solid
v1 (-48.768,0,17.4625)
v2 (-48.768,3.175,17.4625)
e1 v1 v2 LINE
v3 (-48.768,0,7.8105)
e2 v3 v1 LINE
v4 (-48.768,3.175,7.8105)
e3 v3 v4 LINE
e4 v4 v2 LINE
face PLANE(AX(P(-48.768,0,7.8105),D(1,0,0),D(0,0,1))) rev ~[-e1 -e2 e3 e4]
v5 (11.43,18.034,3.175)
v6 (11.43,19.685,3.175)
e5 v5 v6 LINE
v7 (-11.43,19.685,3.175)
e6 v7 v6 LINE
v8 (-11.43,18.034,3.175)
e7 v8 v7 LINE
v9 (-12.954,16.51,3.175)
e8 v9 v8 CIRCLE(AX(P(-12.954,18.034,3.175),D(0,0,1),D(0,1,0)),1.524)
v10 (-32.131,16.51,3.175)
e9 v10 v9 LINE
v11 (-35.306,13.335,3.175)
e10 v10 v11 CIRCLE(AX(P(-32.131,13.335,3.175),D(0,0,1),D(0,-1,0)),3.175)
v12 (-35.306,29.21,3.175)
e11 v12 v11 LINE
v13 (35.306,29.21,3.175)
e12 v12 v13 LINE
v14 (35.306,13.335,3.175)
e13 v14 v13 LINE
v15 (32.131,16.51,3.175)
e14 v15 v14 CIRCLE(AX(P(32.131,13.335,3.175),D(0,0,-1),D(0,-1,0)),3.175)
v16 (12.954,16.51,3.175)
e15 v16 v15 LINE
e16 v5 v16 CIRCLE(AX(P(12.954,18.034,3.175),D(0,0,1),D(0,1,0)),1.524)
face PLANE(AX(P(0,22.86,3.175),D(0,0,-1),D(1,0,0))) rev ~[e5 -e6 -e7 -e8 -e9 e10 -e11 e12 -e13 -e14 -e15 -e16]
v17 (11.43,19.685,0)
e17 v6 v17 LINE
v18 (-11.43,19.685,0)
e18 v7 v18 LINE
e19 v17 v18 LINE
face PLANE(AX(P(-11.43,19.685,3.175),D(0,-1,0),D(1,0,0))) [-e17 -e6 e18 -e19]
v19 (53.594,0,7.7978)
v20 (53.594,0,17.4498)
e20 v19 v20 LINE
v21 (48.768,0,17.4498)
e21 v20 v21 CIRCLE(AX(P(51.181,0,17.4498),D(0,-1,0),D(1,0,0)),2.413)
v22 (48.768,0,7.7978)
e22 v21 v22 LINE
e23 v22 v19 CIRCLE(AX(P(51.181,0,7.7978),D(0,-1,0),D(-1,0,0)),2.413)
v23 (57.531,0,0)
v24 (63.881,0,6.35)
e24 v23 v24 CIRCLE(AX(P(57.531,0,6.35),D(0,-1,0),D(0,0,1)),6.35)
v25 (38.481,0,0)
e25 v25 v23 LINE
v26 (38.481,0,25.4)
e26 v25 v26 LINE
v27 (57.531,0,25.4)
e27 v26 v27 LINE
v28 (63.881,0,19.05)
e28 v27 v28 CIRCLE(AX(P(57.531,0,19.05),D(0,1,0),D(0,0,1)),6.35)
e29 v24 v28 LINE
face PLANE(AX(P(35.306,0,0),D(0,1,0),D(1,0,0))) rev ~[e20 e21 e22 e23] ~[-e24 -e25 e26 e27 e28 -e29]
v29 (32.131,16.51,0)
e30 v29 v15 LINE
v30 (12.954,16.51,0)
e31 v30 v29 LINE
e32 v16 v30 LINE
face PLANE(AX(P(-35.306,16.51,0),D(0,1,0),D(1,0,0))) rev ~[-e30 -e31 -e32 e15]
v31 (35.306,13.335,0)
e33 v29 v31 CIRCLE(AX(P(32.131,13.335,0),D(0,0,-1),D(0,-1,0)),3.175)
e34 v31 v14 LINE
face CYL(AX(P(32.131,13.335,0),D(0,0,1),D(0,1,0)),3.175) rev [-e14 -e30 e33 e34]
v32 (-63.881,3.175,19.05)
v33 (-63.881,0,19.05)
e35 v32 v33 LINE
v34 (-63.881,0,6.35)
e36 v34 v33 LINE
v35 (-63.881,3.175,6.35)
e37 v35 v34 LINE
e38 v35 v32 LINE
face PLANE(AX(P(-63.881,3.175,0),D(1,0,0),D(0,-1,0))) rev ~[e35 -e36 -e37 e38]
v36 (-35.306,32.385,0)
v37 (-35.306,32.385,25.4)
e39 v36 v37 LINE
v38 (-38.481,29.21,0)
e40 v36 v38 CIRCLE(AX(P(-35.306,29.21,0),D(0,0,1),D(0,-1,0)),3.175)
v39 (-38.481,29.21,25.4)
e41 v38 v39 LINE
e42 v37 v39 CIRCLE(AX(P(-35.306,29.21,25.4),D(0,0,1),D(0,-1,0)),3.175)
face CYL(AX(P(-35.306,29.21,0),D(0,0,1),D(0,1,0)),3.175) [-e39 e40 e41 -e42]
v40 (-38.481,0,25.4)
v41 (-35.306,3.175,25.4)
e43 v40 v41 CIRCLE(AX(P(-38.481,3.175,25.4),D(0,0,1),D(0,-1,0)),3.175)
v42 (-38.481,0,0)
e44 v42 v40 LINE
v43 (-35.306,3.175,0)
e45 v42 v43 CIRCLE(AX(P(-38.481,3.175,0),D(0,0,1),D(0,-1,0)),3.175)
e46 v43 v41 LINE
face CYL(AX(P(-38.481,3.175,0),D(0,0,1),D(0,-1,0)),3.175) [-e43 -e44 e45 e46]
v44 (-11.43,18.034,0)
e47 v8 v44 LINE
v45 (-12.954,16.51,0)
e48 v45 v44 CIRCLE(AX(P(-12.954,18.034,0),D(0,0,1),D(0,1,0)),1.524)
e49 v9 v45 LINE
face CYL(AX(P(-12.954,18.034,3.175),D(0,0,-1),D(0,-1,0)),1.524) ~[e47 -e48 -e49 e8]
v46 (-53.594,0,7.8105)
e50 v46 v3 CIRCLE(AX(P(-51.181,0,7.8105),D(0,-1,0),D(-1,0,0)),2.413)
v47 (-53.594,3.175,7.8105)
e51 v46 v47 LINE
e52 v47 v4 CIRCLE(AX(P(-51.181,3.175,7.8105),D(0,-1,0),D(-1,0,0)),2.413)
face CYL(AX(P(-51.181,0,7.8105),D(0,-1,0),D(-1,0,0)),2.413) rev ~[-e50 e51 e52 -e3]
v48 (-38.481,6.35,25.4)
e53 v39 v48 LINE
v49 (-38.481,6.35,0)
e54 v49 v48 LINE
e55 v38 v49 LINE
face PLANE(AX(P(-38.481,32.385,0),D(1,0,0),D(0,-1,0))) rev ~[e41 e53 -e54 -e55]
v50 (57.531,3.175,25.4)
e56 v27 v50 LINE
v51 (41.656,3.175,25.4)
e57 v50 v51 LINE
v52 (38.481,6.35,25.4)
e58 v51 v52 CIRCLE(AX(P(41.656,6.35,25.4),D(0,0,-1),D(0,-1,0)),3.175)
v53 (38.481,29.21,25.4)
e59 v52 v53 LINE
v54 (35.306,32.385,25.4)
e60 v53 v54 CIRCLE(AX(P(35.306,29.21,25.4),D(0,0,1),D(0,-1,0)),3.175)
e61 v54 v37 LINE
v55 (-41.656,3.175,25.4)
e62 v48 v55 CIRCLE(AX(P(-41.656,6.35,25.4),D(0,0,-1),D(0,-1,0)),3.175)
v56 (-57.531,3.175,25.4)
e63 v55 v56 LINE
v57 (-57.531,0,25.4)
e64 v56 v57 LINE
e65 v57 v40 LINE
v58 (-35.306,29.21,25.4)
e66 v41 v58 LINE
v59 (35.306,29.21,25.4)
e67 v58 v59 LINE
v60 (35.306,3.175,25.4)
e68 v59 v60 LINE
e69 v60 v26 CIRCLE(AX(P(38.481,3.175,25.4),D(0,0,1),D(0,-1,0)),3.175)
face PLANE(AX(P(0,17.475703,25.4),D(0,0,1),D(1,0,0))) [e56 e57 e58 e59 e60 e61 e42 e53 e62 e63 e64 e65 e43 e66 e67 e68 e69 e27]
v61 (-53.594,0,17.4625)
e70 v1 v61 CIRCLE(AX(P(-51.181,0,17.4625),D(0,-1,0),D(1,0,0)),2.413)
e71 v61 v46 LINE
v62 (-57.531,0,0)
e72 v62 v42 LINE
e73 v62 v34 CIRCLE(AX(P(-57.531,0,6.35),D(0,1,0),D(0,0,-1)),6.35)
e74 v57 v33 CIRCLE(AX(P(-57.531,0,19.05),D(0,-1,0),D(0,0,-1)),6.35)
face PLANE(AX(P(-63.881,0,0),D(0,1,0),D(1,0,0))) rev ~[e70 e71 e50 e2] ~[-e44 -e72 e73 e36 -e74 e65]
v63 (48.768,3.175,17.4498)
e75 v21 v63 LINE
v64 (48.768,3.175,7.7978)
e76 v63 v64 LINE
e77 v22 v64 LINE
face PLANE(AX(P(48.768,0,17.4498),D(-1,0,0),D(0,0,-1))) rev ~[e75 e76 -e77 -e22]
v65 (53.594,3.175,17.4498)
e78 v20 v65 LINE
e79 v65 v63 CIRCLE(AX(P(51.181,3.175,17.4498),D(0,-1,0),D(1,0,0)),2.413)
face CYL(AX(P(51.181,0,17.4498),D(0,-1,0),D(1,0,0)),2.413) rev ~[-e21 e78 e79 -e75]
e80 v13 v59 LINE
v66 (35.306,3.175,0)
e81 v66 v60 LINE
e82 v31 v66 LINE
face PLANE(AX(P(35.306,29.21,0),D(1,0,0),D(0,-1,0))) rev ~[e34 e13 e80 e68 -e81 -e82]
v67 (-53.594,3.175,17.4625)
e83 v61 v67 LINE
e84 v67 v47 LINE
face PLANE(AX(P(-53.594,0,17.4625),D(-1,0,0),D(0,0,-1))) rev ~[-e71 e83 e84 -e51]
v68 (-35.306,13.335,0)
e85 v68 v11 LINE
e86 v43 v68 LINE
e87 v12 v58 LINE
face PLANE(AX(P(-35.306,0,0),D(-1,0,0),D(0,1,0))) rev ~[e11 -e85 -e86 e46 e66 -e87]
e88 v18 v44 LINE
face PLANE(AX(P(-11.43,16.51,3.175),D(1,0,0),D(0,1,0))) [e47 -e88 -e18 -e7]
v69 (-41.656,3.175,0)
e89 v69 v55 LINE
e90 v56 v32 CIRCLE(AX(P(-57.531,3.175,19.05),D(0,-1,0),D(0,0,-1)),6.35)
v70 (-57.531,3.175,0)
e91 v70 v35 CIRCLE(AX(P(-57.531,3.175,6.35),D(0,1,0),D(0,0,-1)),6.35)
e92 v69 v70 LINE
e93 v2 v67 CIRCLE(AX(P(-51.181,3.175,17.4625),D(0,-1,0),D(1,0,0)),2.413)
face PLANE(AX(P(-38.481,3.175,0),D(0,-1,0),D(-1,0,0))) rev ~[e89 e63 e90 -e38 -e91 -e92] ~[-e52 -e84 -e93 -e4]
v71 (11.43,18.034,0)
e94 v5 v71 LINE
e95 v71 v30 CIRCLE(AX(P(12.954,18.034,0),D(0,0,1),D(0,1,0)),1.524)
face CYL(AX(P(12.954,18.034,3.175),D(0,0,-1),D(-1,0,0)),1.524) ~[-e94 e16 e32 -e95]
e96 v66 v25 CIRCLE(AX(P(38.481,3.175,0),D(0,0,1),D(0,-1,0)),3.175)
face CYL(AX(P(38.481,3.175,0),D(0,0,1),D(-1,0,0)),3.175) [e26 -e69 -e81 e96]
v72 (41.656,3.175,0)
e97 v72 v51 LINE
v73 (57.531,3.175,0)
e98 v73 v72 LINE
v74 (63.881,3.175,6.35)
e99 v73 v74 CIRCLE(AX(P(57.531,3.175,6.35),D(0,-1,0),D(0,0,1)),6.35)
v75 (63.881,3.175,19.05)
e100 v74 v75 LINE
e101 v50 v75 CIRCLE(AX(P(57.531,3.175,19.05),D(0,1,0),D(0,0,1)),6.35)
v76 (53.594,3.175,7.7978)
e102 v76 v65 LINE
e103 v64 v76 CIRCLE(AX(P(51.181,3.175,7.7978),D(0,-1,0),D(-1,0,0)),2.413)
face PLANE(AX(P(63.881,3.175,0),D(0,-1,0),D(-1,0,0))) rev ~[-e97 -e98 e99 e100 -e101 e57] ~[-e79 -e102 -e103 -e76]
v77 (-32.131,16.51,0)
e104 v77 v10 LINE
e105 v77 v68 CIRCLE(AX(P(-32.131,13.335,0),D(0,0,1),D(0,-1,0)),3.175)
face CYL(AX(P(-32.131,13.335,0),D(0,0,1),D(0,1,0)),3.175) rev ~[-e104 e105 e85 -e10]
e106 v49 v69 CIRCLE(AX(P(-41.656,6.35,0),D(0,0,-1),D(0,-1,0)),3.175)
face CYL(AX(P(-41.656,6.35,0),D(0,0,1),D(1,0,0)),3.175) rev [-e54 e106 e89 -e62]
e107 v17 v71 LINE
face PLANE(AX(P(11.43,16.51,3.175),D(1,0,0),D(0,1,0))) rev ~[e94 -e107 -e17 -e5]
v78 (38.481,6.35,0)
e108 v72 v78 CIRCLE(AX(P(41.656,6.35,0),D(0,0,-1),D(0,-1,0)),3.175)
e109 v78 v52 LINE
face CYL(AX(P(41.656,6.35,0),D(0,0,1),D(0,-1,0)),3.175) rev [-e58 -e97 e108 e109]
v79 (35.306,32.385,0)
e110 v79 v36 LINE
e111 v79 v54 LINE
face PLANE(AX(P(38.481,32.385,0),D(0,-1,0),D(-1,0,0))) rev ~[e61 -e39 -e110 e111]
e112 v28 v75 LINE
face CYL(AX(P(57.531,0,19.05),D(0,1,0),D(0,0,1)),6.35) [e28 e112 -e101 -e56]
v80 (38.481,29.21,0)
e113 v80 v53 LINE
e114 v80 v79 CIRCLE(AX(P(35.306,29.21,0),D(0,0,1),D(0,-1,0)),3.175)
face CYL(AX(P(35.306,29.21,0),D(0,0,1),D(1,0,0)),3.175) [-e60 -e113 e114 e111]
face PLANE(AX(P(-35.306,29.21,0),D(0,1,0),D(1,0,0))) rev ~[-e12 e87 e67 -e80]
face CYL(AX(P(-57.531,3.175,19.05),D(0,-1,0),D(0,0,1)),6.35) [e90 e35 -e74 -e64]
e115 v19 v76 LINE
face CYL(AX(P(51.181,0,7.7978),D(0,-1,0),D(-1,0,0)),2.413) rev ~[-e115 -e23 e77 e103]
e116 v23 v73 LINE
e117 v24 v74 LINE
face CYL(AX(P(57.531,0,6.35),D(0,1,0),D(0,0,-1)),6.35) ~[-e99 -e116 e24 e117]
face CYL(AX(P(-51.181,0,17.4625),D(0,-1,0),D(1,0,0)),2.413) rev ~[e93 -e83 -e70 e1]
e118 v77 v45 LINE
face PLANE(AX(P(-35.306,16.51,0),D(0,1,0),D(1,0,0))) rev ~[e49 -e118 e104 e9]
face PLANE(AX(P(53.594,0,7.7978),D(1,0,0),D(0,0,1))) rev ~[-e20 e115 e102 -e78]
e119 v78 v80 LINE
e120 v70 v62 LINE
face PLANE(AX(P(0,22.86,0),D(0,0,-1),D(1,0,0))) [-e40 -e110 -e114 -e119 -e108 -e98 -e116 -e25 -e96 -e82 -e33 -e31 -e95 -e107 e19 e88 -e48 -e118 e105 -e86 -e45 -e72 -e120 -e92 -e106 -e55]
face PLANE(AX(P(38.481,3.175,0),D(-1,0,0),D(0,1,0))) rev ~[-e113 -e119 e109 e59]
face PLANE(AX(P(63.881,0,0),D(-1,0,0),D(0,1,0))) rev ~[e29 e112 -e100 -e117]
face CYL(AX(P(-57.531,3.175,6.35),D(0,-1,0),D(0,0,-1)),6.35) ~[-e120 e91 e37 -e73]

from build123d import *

# Parameters (mm, degrees)
F1_DEPTH  = 25.4
F2_R      = 3.175
F4_DEPTH  = 32.386
F5_R      = 6.35
F6_W      = 70.612
F6_H      = 12.7
F7_DEPTH  = 3.175
F8_R      = 3.175
F9_W      = 22.86
F9_H      = 3.175
F10_DEPTH = 25.4
F11_R     = 1.524


with BuildPart() as f1:
    # F0 (on Top) → F1 (new body)
    with BuildSketch(Plane.XY):
        Polygon((-35.306, 29.21), (0, 29.21), (35.306, 29.21), (35.306, 0), (63.881, 0), (63.881, 3.175), (38.481, 3.175), (38.481, 32.385), (0, 32.385), (-38.481, 32.385), (-38.481, 3.175), (-63.881, 3.175), (-63.881, 0), (-35.306, 0), align=None)
    extrude(amount=F1_DEPTH)

    # F2
    f2_edges = [f1.edges().sort_by_distance(p)[0] for p in [
        (-35.306, 0, 12.7),
        (35.306, 0, 12.7),
    ]]
    fillet(f2_edges, radius=F2_R)

    # F3 (on Front) → F4 (cut, through all)
    with BuildSketch(Plane.XZ):
        with BuildLine():
            ThreePointArc((-53.594, 7.8105), (-51.181, 5.3975), (-48.768, 7.8105))
            Line((-48.768, 7.8105), (-48.768, 17.4625))
            ThreePointArc((-48.768, 17.4625), (-51.181, 19.8755), (-53.594, 17.4625))
            Line((-53.594, 17.4625), (-53.594, 7.8105))
        make_face()
        with BuildLine():
            ThreePointArc((53.594, 17.4498), (51.181, 19.8628), (48.768, 17.4498))
            Line((48.768, 17.4498), (48.768, 7.7978))
            ThreePointArc((48.768, 7.7978), (51.181, 5.3848), (53.594, 7.7978))
            Line((53.594, 7.7978), (53.594, 17.4498))
        make_face()
    extrude(amount=-F4_DEPTH, mode=Mode.SUBTRACT)

    # F5
    f5_edges = [f1.edges().sort_by_distance(p)[0] for p in [
        (-63.881, 1.5875, 0),
        (-63.881, 1.5875, 25.4),
        (63.881, 1.5875, 25.4),
        (63.881, 1.5875, 0),
    ]]
    fillet(f5_edges, radius=F5_R)

    # F6 (on face) → F7 (join)
    with BuildSketch(Plane(origin=(0, 0, 0), x_dir=(1, 0, 0), z_dir=(0, 0, -1))):
        with Locations((0, -22.86)):
            Rectangle(F6_W, F6_H)
    extrude(amount=-F7_DEPTH)

    # F8
    f8_edges = [f1.edges().sort_by_distance(p)[0] for p in [
        (38.481, 3.175, 12.7),
        (38.481, 32.385, 12.7),
        (-38.481, 32.385, 12.7),
        (-38.481, 3.175, 12.7),
        (35.306, 16.51, 1.5875),
        (-35.306, 16.51, 1.5875),
    ]]
    fillet(f8_edges, radius=F8_R)

    # F9 (on face) → F10 (cut)
    with BuildSketch(Plane.XY.offset(3.175)):
        with Locations((0, 18.0975)):
            Rectangle(F9_W, F9_H)
    extrude(amount=-F10_DEPTH, mode=Mode.SUBTRACT)

    # F11
    f11_edges = [f1.edges().sort_by_distance(p)[0] for p in [
        (-11.43, 16.51, 1.5875),
        (11.43, 16.51, 1.5875),
    ]]
    fillet(f11_edges, radius=F11_R)


solid = f1.part
